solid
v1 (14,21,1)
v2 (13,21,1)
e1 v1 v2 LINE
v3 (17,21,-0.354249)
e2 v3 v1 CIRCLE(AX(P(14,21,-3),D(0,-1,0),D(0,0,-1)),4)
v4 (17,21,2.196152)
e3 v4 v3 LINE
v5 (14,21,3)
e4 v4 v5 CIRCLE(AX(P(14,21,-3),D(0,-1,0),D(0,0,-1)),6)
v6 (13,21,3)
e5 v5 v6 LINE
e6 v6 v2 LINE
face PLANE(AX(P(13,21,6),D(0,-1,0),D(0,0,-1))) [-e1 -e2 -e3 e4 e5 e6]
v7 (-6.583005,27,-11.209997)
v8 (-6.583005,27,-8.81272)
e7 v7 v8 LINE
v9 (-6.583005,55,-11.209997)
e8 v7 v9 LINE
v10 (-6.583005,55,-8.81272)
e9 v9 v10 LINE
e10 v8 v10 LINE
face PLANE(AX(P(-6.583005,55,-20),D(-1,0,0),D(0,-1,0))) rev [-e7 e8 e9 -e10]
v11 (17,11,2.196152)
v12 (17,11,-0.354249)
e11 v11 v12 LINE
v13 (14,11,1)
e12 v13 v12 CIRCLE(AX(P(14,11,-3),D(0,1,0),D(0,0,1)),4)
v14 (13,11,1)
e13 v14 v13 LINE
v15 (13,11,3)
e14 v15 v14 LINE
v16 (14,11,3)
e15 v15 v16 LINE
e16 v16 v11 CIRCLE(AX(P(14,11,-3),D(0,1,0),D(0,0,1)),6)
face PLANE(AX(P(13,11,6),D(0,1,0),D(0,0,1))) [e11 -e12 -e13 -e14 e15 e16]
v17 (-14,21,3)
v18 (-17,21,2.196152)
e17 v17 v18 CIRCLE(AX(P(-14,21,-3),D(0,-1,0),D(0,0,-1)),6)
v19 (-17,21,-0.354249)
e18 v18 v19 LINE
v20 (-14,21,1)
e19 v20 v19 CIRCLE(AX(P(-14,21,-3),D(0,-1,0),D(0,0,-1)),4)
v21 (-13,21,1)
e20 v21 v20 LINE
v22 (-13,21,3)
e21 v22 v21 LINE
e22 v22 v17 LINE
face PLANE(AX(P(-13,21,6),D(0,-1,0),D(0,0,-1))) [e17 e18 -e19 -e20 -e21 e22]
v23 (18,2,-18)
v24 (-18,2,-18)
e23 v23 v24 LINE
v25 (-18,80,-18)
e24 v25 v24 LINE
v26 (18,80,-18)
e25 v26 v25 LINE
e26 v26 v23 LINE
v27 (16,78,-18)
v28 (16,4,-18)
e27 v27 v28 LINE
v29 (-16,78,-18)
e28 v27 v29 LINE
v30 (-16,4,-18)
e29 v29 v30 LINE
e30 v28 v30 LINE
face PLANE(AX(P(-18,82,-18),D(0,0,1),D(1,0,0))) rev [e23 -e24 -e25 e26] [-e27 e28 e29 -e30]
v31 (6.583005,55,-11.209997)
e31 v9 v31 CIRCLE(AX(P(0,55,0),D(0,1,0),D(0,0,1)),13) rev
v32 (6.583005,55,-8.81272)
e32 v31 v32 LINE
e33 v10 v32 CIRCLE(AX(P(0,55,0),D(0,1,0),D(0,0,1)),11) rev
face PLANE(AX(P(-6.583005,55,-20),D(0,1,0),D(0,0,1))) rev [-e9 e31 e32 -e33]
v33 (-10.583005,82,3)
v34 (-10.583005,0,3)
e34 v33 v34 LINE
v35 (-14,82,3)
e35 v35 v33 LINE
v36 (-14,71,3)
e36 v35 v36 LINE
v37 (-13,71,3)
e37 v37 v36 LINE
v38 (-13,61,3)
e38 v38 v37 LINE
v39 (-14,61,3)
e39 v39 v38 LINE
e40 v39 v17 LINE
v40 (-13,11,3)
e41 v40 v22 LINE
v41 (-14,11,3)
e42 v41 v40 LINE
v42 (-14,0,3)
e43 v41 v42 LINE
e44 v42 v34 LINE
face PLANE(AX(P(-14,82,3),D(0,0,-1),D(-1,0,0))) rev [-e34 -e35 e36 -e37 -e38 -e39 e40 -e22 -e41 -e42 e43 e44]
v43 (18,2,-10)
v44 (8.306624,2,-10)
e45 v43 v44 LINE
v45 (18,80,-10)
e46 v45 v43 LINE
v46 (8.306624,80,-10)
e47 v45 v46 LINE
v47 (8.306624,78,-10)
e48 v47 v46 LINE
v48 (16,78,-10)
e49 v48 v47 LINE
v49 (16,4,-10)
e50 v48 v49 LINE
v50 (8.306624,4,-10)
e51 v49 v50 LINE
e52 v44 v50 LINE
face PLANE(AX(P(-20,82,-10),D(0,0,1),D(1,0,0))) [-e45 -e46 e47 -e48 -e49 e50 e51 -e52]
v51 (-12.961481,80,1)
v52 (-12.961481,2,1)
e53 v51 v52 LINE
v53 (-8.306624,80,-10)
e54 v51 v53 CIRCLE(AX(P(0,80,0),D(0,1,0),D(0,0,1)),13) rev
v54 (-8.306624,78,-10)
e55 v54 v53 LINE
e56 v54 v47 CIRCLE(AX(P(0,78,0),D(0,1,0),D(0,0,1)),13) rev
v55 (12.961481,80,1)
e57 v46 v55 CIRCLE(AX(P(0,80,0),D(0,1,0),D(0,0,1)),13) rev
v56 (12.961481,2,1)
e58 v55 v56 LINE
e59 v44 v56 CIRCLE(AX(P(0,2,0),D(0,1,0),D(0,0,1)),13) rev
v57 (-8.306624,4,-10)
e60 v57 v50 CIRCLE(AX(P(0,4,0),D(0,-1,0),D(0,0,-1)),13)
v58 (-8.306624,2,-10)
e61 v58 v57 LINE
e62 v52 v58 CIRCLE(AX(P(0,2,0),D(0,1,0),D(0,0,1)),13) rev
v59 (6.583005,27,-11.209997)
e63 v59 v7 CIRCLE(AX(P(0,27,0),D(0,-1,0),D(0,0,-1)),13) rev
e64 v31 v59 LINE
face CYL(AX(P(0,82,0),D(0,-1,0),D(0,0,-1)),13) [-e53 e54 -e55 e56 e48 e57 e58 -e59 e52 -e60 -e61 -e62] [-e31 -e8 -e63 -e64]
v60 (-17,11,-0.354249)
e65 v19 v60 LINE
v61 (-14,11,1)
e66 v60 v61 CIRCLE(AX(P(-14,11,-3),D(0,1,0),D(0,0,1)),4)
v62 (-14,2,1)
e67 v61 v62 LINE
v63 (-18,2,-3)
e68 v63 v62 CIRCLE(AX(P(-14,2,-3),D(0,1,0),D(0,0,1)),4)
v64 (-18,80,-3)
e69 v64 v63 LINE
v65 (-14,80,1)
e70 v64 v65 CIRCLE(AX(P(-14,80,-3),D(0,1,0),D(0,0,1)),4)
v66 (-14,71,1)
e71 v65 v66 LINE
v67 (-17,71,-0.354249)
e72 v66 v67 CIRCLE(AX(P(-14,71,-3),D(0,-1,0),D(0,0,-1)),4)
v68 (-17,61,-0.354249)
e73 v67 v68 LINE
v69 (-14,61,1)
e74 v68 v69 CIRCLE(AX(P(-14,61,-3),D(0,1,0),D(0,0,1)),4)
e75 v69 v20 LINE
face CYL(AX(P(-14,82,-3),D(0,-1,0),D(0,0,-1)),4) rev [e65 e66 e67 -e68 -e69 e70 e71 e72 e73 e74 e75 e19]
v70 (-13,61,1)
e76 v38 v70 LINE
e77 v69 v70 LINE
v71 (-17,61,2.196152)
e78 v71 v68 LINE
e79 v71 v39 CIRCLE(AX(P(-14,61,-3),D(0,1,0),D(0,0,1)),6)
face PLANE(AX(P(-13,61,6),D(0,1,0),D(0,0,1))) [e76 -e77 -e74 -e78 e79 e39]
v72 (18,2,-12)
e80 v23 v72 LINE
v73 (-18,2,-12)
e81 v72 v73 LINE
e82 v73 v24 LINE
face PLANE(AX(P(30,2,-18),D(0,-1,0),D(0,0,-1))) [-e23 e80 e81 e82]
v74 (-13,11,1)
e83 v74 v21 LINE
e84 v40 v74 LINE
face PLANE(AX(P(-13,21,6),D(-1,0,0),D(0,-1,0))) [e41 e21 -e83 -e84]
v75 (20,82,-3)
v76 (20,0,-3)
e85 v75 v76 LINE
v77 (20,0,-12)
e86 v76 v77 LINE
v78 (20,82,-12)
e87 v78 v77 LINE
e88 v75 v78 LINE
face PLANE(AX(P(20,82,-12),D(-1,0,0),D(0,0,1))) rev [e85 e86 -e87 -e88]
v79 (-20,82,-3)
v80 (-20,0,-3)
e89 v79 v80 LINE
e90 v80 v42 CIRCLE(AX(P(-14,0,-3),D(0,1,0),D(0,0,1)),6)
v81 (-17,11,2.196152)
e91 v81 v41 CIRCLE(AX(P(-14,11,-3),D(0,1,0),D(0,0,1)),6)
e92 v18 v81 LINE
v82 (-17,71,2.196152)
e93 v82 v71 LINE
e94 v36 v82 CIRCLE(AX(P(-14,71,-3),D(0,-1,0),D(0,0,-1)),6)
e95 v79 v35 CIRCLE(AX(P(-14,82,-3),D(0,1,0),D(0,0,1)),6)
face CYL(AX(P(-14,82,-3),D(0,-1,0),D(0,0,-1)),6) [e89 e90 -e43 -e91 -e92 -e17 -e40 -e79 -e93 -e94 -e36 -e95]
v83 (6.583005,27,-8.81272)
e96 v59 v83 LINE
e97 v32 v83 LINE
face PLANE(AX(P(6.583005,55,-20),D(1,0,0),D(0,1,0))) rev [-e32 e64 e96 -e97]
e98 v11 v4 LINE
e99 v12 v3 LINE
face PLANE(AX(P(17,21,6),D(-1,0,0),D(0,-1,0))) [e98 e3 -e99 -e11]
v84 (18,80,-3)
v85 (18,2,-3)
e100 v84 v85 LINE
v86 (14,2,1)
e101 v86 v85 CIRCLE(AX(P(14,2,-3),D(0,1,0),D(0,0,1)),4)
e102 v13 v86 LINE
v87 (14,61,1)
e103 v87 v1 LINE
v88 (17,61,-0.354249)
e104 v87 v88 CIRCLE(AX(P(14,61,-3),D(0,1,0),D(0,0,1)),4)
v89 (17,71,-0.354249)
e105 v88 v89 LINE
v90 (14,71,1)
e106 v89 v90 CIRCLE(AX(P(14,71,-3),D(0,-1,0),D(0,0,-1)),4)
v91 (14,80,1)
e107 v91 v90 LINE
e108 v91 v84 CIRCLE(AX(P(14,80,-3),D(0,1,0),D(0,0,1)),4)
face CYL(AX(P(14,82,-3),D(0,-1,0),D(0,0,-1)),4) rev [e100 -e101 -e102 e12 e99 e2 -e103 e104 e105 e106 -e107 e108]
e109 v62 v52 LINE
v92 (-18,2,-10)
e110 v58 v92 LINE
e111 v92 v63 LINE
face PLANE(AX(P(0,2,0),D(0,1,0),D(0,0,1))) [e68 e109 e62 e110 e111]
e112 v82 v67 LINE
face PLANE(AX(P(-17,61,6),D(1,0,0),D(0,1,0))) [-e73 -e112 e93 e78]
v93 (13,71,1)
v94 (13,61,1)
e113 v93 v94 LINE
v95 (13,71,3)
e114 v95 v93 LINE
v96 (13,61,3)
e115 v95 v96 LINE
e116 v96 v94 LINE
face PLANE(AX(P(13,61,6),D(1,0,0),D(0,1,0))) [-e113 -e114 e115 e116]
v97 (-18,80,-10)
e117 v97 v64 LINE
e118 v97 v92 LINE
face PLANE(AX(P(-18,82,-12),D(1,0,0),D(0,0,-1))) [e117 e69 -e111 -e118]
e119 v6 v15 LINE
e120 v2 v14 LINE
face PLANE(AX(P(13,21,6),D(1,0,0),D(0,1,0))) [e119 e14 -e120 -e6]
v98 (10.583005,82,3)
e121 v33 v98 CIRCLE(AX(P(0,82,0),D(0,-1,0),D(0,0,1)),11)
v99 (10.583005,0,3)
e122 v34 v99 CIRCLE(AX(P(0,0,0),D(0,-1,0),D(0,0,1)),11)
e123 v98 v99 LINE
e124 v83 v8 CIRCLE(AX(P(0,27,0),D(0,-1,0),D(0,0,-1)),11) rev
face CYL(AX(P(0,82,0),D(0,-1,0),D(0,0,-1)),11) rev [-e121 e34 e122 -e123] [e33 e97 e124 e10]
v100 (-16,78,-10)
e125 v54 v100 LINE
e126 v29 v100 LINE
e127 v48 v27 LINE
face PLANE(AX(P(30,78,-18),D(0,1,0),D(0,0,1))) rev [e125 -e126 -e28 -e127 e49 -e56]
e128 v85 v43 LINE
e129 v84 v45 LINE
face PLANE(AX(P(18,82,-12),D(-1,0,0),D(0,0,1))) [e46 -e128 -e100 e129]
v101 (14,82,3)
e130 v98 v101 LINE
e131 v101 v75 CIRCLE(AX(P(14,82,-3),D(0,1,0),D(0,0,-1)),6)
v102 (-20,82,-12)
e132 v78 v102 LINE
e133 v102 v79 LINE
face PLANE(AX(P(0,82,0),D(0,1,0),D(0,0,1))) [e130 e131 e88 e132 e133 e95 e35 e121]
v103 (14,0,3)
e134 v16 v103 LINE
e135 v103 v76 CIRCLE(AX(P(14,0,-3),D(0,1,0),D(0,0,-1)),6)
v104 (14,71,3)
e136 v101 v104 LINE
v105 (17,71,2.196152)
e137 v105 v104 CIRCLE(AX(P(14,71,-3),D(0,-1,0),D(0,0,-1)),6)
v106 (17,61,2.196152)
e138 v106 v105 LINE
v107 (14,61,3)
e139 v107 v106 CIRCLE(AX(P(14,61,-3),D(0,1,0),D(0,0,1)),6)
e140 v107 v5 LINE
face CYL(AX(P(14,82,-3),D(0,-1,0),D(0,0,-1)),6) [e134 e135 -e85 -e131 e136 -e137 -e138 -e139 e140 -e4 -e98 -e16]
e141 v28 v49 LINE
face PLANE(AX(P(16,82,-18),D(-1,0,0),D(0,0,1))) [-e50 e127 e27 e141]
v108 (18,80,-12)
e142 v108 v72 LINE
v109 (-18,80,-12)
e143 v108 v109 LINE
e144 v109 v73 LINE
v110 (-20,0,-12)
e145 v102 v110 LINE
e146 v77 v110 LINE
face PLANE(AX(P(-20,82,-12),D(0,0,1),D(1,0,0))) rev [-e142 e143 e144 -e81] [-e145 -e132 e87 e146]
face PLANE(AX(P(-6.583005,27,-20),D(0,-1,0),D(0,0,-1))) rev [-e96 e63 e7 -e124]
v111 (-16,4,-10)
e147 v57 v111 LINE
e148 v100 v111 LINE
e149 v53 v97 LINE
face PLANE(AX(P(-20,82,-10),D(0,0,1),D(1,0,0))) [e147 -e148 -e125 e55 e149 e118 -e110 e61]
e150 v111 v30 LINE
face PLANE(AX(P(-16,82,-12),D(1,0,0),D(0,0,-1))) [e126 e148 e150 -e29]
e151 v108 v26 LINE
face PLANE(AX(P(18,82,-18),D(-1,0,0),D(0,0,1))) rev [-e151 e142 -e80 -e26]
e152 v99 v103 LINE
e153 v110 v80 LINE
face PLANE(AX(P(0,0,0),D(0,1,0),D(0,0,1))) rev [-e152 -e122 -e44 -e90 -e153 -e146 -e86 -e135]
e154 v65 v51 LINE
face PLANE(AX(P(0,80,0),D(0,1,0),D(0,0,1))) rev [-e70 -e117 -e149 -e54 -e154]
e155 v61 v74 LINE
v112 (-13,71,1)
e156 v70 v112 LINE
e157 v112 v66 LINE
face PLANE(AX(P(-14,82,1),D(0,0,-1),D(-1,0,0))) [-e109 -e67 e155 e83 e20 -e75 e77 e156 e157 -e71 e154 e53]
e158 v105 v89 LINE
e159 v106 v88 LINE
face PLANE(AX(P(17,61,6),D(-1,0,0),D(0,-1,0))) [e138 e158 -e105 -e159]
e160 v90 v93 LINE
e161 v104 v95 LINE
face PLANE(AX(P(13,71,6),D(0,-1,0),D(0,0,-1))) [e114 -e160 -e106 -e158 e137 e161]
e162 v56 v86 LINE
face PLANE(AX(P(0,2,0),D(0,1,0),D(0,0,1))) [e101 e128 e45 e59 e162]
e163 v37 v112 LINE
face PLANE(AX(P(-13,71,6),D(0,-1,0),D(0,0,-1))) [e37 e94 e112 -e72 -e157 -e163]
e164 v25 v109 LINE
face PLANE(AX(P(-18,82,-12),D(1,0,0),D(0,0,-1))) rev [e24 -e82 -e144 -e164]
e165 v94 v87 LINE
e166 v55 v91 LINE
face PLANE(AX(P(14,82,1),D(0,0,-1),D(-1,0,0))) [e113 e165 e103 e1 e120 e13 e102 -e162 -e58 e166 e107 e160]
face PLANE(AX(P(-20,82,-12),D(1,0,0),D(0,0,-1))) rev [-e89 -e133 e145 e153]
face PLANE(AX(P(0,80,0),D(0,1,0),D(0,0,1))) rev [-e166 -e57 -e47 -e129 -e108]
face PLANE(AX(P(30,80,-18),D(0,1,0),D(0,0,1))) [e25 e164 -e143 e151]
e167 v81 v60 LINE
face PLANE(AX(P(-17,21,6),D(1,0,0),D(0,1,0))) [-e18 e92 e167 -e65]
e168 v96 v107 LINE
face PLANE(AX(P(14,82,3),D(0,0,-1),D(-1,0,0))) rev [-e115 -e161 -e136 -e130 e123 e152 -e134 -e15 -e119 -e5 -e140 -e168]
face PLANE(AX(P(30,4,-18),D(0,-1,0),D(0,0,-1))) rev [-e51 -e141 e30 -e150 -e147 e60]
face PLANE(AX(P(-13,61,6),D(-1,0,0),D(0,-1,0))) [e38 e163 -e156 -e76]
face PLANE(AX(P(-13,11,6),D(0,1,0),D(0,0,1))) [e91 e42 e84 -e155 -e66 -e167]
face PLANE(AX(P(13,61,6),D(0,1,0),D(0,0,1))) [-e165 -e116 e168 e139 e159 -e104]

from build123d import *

# Parameters (mm, degrees)
BOSS_EXTRUDE1_DEPTH     = 82
CUT_EXTRUDE1_DEPTH      = 30
CUT_EXTRUDE1_DEPTH_BACK = 30
SKETCH2_W               = 6
SKETCH2_H               = 2
SHELL1_START            = 4
SHELL1_DEPTH            = 74
SHELL1_START_2          = 2
SHELL1_2_DEPTH          = 78
CUT_EXTRUDE2_DEPTH      = 6
CUT_EXTRUDE2_DEPTH_BACK = 6
SKETCH3_W               = 4
SKETCH3_H               = 10
SKETCH4_W               = 13.166010488
SKETCH4_H               = 28
CUT_EXTRUDE3_DEPTH      = 20


# Read off the part's stored shape, not the designer's step: Shell1
with BuildPart() as part:
    # Sketch1 → Boss-Extrude1 (new body)
    with BuildSketch(Plane(origin=(0, 0, 0), x_dir=(1, 0, 0), z_dir=(0, 1, 0))):
        with BuildLine():
            Line((-20, 12), (-20, 3))
            ThreePointArc((-20, 3), (-18.242640687, -1.242640687), (-14, -3))
            Line((-14, -3), (-10.583005244, -3))
            ThreePointArc((-10.583005244, -3), (0, 11), (10.583005244, -3))
            Line((10.583005244, -3), (14, -3))
            ThreePointArc((14, -3), (18.242640687, -1.242640687), (20, 3))
            Line((20, 3), (20, 12))
            Line((20, 12), (18, 12))
            Line((18, 12), (18, 18))
            Line((18, 18), (-18, 18))
            Line((-18, 18), (-18, 12))
            Line((-18, 12), (-20, 12))
        make_face()
    extrude(amount=BOSS_EXTRUDE1_DEPTH)

    # Sketch2 → Cut-Extrude1 (cut, two sides: drawn at the far end of the back side and taken through both)
    with BuildSketch(Plane(origin=(0, 0, 0), x_dir=(0, 0, -1), z_dir=(1, 0, 0)).offset(-CUT_EXTRUDE1_DEPTH_BACK)):
        with Locations((15, 81)):
            Rectangle(SKETCH2_W, SKETCH2_H)
        with Locations((15, 1)):
            Rectangle(SKETCH2_W, SKETCH2_H)
    extrude(amount=CUT_EXTRUDE1_DEPTH + CUT_EXTRUDE1_DEPTH_BACK, mode=Mode.SUBTRACT)

    # Shell1 outline → Shell1 (cut)
    with BuildSketch(Plane(origin=(0, 0, 0), x_dir=(1, 0, 0), z_dir=(0, 1, 0)).offset(SHELL1_START)):
        with BuildLine():
            Line((-14, -1), (-12.961481397, -1))
            ThreePointArc((-12.961481397, -1), (0, 13), (12.961481397, -1))
            Line((12.961481397, -1), (14, -1))
            ThreePointArc((14, -1), (16.828427125, 0.171572875), (18, 3))
            Line((18, 3), (18, 10))
            Line((18, 10), (16, 10))
            Line((16, 10), (16, 18))
            Line((16, 18), (-16, 18))
            Line((-16, 18), (-16, 10))
            Line((-16, 10), (-18, 10))
            Line((-18, 10), (-18, 3))
            ThreePointArc((-18, 3), (-16.828427125, 0.171572875), (-14, -1))
        make_face()
    extrude(amount=SHELL1_DEPTH, mode=Mode.SUBTRACT)

    # Shell1 2 outline → Shell1 2 (cut)
    with BuildSketch(Plane(origin=(0, 0, 0), x_dir=(1, 0, 0), z_dir=(0, 1, 0)).offset(SHELL1_START_2)):
        with BuildLine():
            Line((-14, -1), (-12.961481397, -1))
            ThreePointArc((-12.961481397, -1), (-11.972179223, 5.066253514), (-8.306623863, 10))
            Line((-8.306623863, 10), (-18, 10))
            Line((-18, 10), (-18, 3))
            ThreePointArc((-18, 3), (-16.828427125, 0.171572875), (-14, -1))
        make_face()
        with BuildLine():
            Line((18, 10), (8.306623863, 10))
            ThreePointArc((8.306623863, 10), (11.972179223, 5.066253514), (12.961481397, -1))
            Line((12.961481397, -1), (14, -1))
            ThreePointArc((14, -1), (16.828427125, 0.171572875), (18, 3))
            Line((18, 3), (18, 10))
        make_face()
    extrude(amount=SHELL1_2_DEPTH, mode=Mode.SUBTRACT)

    # Sketch3 → Cut-Extrude2 (cut, two sides: drawn at the far end of the back side and taken through both)
    with BuildSketch(Plane.XY.offset(-CUT_EXTRUDE2_DEPTH_BACK)):
        with Locations((-15, 16)):
            Rectangle(SKETCH3_W, SKETCH3_H)
        with Locations((15, 16)):
            Rectangle(SKETCH3_W, SKETCH3_H)
        with Locations((15, 66)):
            Rectangle(SKETCH3_W, SKETCH3_H)
        with Locations((-15, 66)):
            Rectangle(SKETCH3_W, SKETCH3_H)
    extrude(amount=CUT_EXTRUDE2_DEPTH + CUT_EXTRUDE2_DEPTH_BACK, mode=Mode.SUBTRACT)

    # Sketch4 → Cut-Extrude3 (cut)
    with BuildSketch(Plane.XY):
        with Locations((0, 41)):
            Rectangle(SKETCH4_W, SKETCH4_H)
    extrude(amount=-CUT_EXTRUDE3_DEPTH, mode=Mode.SUBTRACT)


solid = part.part
